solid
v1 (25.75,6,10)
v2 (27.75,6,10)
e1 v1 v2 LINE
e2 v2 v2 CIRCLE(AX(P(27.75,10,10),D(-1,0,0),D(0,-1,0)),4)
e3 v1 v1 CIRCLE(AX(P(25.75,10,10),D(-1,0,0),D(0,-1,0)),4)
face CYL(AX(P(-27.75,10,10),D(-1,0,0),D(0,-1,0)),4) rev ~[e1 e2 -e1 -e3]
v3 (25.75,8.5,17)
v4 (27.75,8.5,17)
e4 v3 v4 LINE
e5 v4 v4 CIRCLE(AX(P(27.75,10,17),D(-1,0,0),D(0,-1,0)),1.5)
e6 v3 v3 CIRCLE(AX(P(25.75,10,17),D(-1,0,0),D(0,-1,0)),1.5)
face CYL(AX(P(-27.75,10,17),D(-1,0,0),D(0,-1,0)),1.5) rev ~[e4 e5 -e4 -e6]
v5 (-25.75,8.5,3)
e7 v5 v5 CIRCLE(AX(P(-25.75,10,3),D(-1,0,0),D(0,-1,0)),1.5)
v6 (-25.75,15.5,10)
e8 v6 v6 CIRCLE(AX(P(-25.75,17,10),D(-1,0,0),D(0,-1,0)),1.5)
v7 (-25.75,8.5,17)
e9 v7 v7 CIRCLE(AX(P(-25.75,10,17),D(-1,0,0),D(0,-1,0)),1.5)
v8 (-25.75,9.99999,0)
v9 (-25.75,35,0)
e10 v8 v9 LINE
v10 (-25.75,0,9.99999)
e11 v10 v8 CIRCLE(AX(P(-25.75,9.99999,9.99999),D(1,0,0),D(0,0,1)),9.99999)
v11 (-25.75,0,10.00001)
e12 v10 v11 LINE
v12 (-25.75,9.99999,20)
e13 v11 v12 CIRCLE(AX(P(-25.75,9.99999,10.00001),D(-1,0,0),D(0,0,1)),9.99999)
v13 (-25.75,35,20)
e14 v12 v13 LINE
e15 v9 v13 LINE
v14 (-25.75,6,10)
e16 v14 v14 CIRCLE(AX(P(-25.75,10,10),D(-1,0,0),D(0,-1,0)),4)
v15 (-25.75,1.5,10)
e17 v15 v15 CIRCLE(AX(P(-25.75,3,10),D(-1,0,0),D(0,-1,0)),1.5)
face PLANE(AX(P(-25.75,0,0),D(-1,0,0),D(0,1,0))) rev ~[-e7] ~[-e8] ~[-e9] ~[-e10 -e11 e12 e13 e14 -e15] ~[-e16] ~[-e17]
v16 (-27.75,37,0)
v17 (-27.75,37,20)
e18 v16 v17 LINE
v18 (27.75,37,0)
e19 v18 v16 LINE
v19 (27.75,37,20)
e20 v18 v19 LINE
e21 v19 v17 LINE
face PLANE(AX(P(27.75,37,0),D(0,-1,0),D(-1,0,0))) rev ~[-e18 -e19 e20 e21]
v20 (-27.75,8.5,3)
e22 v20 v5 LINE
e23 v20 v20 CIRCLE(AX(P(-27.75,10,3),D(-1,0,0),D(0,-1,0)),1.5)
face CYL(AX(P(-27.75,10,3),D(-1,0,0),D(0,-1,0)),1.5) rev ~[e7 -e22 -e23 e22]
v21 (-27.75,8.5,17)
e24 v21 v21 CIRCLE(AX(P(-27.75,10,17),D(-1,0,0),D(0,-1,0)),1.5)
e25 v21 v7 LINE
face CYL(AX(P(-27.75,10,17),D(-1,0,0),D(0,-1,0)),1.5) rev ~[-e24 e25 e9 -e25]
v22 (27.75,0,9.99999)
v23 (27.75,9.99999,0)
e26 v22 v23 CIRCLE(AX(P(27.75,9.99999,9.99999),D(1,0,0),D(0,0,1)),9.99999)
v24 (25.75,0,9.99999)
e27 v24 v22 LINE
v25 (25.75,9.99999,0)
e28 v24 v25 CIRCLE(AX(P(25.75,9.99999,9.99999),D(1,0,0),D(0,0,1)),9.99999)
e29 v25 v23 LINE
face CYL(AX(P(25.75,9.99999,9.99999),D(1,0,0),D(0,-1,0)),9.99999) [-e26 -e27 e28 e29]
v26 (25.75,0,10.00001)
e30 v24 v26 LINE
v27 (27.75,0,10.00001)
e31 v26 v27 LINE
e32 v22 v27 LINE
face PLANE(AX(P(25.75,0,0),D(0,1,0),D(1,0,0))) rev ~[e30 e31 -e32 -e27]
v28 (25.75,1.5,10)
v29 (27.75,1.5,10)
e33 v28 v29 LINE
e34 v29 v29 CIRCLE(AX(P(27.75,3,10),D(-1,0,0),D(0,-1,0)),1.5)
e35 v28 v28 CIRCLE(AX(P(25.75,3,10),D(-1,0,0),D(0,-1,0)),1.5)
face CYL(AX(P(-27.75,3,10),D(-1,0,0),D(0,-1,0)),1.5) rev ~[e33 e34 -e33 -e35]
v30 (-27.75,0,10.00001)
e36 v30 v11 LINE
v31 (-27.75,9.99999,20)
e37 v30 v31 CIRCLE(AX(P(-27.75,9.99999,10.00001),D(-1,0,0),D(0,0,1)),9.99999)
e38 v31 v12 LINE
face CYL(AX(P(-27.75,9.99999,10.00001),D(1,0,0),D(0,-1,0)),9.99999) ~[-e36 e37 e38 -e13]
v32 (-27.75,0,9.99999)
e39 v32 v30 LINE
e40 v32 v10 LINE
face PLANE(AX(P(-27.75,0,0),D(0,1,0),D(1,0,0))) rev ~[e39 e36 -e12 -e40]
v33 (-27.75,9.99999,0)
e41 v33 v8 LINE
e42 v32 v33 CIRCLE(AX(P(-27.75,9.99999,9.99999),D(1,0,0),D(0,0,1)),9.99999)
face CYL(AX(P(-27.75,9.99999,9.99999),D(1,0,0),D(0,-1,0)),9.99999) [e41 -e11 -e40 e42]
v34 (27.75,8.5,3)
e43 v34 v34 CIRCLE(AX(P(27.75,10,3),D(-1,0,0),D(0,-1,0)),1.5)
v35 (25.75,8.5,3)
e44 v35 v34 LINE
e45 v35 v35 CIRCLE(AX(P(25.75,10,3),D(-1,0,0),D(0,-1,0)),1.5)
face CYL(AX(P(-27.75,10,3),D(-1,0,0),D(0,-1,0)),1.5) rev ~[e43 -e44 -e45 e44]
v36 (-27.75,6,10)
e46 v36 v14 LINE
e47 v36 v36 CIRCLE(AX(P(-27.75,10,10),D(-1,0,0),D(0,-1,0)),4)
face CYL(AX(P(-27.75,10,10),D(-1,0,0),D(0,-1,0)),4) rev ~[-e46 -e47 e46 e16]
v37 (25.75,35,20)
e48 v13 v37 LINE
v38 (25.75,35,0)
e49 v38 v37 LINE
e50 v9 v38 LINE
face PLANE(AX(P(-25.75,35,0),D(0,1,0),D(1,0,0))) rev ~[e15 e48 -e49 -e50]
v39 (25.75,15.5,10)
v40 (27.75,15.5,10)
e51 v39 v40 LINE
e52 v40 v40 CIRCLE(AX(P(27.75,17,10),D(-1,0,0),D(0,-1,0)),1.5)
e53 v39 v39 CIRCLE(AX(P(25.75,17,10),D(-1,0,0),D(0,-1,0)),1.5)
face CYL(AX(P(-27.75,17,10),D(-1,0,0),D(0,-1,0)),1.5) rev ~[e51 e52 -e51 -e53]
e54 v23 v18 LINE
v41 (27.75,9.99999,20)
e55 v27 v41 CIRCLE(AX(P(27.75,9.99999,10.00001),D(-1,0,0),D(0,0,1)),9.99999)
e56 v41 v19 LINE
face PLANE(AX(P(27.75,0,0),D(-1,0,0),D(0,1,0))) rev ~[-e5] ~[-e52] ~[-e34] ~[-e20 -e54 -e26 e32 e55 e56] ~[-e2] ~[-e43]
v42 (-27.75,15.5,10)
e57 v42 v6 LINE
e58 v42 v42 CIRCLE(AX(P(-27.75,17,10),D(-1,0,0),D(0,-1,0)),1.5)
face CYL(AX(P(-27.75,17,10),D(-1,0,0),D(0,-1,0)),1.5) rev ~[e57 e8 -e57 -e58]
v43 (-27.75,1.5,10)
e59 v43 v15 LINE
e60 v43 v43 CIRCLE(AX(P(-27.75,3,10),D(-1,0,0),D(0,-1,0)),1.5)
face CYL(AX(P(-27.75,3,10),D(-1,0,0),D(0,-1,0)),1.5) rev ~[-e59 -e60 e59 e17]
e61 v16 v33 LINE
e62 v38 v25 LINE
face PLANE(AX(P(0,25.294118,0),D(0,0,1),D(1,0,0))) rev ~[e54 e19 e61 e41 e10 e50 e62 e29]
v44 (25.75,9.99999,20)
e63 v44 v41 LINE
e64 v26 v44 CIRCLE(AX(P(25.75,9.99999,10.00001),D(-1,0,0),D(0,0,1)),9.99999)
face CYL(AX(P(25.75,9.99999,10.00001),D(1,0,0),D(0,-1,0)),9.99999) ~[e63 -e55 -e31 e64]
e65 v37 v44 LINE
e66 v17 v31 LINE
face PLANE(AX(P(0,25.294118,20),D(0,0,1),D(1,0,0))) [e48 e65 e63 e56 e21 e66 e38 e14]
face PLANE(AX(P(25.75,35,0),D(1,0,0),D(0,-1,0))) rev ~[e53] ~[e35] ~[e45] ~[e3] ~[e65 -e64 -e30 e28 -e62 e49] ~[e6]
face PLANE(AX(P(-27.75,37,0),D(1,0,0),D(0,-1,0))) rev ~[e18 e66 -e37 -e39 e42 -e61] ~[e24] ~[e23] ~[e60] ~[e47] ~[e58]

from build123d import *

# Parameters (mm, degrees)
F1_DEPTH = 20
F2_R     = 9.99999
F3_R     = 4
F3_R_2   = 1.5
F4_DEPTH = 55.501


# Not quite as in the source:
# - a fillet or chamfer is up to 0.001 mm smaller than in the source, because OpenCascade refuses the exact size


with BuildPart() as f1:
    # F0 (on Top) → F1 (new body)
    with BuildSketch(Plane.XY):
        Polygon((-27.75, 37), (-27.75, 0), (-25.75, 0), (-25.75, 35), (25.75, 35), (25.75, 0), (27.75, 0), (27.75, 37), align=None)
    extrude(amount=F1_DEPTH)

    # F2 (radius 10 in the source; OpenCascade refuses exactly that, so slightly less here)
    f2_edges = [f1.edges().sort_by_distance(p)[0] for p in [
        (-26.75, 0, 0),
        (-26.75, 0, 20),
        (26.75, 0, 0),
        (26.75, 0, 20),
    ]]
    fillet(f2_edges, radius=F2_R)

    # F3 (on face) → F4 (cut, through all)
    with BuildSketch(Plane(origin=(-27.75, 0, 0), x_dir=(0, -1, 0), z_dir=(-1, 0, 0))):
        with Locations((-10, 10)):
            Circle(F3_R)
        with Locations((-10, 3)):
            Circle(F3_R_2)
        with Locations((-10, 17)):
            Circle(F3_R_2)
        with Locations((-3, 10)):
            Circle(F3_R_2)
        with Locations((-17, 10)):
            Circle(F3_R_2)
    extrude(amount=-F4_DEPTH, mode=Mode.SUBTRACT)


solid = f1.part
